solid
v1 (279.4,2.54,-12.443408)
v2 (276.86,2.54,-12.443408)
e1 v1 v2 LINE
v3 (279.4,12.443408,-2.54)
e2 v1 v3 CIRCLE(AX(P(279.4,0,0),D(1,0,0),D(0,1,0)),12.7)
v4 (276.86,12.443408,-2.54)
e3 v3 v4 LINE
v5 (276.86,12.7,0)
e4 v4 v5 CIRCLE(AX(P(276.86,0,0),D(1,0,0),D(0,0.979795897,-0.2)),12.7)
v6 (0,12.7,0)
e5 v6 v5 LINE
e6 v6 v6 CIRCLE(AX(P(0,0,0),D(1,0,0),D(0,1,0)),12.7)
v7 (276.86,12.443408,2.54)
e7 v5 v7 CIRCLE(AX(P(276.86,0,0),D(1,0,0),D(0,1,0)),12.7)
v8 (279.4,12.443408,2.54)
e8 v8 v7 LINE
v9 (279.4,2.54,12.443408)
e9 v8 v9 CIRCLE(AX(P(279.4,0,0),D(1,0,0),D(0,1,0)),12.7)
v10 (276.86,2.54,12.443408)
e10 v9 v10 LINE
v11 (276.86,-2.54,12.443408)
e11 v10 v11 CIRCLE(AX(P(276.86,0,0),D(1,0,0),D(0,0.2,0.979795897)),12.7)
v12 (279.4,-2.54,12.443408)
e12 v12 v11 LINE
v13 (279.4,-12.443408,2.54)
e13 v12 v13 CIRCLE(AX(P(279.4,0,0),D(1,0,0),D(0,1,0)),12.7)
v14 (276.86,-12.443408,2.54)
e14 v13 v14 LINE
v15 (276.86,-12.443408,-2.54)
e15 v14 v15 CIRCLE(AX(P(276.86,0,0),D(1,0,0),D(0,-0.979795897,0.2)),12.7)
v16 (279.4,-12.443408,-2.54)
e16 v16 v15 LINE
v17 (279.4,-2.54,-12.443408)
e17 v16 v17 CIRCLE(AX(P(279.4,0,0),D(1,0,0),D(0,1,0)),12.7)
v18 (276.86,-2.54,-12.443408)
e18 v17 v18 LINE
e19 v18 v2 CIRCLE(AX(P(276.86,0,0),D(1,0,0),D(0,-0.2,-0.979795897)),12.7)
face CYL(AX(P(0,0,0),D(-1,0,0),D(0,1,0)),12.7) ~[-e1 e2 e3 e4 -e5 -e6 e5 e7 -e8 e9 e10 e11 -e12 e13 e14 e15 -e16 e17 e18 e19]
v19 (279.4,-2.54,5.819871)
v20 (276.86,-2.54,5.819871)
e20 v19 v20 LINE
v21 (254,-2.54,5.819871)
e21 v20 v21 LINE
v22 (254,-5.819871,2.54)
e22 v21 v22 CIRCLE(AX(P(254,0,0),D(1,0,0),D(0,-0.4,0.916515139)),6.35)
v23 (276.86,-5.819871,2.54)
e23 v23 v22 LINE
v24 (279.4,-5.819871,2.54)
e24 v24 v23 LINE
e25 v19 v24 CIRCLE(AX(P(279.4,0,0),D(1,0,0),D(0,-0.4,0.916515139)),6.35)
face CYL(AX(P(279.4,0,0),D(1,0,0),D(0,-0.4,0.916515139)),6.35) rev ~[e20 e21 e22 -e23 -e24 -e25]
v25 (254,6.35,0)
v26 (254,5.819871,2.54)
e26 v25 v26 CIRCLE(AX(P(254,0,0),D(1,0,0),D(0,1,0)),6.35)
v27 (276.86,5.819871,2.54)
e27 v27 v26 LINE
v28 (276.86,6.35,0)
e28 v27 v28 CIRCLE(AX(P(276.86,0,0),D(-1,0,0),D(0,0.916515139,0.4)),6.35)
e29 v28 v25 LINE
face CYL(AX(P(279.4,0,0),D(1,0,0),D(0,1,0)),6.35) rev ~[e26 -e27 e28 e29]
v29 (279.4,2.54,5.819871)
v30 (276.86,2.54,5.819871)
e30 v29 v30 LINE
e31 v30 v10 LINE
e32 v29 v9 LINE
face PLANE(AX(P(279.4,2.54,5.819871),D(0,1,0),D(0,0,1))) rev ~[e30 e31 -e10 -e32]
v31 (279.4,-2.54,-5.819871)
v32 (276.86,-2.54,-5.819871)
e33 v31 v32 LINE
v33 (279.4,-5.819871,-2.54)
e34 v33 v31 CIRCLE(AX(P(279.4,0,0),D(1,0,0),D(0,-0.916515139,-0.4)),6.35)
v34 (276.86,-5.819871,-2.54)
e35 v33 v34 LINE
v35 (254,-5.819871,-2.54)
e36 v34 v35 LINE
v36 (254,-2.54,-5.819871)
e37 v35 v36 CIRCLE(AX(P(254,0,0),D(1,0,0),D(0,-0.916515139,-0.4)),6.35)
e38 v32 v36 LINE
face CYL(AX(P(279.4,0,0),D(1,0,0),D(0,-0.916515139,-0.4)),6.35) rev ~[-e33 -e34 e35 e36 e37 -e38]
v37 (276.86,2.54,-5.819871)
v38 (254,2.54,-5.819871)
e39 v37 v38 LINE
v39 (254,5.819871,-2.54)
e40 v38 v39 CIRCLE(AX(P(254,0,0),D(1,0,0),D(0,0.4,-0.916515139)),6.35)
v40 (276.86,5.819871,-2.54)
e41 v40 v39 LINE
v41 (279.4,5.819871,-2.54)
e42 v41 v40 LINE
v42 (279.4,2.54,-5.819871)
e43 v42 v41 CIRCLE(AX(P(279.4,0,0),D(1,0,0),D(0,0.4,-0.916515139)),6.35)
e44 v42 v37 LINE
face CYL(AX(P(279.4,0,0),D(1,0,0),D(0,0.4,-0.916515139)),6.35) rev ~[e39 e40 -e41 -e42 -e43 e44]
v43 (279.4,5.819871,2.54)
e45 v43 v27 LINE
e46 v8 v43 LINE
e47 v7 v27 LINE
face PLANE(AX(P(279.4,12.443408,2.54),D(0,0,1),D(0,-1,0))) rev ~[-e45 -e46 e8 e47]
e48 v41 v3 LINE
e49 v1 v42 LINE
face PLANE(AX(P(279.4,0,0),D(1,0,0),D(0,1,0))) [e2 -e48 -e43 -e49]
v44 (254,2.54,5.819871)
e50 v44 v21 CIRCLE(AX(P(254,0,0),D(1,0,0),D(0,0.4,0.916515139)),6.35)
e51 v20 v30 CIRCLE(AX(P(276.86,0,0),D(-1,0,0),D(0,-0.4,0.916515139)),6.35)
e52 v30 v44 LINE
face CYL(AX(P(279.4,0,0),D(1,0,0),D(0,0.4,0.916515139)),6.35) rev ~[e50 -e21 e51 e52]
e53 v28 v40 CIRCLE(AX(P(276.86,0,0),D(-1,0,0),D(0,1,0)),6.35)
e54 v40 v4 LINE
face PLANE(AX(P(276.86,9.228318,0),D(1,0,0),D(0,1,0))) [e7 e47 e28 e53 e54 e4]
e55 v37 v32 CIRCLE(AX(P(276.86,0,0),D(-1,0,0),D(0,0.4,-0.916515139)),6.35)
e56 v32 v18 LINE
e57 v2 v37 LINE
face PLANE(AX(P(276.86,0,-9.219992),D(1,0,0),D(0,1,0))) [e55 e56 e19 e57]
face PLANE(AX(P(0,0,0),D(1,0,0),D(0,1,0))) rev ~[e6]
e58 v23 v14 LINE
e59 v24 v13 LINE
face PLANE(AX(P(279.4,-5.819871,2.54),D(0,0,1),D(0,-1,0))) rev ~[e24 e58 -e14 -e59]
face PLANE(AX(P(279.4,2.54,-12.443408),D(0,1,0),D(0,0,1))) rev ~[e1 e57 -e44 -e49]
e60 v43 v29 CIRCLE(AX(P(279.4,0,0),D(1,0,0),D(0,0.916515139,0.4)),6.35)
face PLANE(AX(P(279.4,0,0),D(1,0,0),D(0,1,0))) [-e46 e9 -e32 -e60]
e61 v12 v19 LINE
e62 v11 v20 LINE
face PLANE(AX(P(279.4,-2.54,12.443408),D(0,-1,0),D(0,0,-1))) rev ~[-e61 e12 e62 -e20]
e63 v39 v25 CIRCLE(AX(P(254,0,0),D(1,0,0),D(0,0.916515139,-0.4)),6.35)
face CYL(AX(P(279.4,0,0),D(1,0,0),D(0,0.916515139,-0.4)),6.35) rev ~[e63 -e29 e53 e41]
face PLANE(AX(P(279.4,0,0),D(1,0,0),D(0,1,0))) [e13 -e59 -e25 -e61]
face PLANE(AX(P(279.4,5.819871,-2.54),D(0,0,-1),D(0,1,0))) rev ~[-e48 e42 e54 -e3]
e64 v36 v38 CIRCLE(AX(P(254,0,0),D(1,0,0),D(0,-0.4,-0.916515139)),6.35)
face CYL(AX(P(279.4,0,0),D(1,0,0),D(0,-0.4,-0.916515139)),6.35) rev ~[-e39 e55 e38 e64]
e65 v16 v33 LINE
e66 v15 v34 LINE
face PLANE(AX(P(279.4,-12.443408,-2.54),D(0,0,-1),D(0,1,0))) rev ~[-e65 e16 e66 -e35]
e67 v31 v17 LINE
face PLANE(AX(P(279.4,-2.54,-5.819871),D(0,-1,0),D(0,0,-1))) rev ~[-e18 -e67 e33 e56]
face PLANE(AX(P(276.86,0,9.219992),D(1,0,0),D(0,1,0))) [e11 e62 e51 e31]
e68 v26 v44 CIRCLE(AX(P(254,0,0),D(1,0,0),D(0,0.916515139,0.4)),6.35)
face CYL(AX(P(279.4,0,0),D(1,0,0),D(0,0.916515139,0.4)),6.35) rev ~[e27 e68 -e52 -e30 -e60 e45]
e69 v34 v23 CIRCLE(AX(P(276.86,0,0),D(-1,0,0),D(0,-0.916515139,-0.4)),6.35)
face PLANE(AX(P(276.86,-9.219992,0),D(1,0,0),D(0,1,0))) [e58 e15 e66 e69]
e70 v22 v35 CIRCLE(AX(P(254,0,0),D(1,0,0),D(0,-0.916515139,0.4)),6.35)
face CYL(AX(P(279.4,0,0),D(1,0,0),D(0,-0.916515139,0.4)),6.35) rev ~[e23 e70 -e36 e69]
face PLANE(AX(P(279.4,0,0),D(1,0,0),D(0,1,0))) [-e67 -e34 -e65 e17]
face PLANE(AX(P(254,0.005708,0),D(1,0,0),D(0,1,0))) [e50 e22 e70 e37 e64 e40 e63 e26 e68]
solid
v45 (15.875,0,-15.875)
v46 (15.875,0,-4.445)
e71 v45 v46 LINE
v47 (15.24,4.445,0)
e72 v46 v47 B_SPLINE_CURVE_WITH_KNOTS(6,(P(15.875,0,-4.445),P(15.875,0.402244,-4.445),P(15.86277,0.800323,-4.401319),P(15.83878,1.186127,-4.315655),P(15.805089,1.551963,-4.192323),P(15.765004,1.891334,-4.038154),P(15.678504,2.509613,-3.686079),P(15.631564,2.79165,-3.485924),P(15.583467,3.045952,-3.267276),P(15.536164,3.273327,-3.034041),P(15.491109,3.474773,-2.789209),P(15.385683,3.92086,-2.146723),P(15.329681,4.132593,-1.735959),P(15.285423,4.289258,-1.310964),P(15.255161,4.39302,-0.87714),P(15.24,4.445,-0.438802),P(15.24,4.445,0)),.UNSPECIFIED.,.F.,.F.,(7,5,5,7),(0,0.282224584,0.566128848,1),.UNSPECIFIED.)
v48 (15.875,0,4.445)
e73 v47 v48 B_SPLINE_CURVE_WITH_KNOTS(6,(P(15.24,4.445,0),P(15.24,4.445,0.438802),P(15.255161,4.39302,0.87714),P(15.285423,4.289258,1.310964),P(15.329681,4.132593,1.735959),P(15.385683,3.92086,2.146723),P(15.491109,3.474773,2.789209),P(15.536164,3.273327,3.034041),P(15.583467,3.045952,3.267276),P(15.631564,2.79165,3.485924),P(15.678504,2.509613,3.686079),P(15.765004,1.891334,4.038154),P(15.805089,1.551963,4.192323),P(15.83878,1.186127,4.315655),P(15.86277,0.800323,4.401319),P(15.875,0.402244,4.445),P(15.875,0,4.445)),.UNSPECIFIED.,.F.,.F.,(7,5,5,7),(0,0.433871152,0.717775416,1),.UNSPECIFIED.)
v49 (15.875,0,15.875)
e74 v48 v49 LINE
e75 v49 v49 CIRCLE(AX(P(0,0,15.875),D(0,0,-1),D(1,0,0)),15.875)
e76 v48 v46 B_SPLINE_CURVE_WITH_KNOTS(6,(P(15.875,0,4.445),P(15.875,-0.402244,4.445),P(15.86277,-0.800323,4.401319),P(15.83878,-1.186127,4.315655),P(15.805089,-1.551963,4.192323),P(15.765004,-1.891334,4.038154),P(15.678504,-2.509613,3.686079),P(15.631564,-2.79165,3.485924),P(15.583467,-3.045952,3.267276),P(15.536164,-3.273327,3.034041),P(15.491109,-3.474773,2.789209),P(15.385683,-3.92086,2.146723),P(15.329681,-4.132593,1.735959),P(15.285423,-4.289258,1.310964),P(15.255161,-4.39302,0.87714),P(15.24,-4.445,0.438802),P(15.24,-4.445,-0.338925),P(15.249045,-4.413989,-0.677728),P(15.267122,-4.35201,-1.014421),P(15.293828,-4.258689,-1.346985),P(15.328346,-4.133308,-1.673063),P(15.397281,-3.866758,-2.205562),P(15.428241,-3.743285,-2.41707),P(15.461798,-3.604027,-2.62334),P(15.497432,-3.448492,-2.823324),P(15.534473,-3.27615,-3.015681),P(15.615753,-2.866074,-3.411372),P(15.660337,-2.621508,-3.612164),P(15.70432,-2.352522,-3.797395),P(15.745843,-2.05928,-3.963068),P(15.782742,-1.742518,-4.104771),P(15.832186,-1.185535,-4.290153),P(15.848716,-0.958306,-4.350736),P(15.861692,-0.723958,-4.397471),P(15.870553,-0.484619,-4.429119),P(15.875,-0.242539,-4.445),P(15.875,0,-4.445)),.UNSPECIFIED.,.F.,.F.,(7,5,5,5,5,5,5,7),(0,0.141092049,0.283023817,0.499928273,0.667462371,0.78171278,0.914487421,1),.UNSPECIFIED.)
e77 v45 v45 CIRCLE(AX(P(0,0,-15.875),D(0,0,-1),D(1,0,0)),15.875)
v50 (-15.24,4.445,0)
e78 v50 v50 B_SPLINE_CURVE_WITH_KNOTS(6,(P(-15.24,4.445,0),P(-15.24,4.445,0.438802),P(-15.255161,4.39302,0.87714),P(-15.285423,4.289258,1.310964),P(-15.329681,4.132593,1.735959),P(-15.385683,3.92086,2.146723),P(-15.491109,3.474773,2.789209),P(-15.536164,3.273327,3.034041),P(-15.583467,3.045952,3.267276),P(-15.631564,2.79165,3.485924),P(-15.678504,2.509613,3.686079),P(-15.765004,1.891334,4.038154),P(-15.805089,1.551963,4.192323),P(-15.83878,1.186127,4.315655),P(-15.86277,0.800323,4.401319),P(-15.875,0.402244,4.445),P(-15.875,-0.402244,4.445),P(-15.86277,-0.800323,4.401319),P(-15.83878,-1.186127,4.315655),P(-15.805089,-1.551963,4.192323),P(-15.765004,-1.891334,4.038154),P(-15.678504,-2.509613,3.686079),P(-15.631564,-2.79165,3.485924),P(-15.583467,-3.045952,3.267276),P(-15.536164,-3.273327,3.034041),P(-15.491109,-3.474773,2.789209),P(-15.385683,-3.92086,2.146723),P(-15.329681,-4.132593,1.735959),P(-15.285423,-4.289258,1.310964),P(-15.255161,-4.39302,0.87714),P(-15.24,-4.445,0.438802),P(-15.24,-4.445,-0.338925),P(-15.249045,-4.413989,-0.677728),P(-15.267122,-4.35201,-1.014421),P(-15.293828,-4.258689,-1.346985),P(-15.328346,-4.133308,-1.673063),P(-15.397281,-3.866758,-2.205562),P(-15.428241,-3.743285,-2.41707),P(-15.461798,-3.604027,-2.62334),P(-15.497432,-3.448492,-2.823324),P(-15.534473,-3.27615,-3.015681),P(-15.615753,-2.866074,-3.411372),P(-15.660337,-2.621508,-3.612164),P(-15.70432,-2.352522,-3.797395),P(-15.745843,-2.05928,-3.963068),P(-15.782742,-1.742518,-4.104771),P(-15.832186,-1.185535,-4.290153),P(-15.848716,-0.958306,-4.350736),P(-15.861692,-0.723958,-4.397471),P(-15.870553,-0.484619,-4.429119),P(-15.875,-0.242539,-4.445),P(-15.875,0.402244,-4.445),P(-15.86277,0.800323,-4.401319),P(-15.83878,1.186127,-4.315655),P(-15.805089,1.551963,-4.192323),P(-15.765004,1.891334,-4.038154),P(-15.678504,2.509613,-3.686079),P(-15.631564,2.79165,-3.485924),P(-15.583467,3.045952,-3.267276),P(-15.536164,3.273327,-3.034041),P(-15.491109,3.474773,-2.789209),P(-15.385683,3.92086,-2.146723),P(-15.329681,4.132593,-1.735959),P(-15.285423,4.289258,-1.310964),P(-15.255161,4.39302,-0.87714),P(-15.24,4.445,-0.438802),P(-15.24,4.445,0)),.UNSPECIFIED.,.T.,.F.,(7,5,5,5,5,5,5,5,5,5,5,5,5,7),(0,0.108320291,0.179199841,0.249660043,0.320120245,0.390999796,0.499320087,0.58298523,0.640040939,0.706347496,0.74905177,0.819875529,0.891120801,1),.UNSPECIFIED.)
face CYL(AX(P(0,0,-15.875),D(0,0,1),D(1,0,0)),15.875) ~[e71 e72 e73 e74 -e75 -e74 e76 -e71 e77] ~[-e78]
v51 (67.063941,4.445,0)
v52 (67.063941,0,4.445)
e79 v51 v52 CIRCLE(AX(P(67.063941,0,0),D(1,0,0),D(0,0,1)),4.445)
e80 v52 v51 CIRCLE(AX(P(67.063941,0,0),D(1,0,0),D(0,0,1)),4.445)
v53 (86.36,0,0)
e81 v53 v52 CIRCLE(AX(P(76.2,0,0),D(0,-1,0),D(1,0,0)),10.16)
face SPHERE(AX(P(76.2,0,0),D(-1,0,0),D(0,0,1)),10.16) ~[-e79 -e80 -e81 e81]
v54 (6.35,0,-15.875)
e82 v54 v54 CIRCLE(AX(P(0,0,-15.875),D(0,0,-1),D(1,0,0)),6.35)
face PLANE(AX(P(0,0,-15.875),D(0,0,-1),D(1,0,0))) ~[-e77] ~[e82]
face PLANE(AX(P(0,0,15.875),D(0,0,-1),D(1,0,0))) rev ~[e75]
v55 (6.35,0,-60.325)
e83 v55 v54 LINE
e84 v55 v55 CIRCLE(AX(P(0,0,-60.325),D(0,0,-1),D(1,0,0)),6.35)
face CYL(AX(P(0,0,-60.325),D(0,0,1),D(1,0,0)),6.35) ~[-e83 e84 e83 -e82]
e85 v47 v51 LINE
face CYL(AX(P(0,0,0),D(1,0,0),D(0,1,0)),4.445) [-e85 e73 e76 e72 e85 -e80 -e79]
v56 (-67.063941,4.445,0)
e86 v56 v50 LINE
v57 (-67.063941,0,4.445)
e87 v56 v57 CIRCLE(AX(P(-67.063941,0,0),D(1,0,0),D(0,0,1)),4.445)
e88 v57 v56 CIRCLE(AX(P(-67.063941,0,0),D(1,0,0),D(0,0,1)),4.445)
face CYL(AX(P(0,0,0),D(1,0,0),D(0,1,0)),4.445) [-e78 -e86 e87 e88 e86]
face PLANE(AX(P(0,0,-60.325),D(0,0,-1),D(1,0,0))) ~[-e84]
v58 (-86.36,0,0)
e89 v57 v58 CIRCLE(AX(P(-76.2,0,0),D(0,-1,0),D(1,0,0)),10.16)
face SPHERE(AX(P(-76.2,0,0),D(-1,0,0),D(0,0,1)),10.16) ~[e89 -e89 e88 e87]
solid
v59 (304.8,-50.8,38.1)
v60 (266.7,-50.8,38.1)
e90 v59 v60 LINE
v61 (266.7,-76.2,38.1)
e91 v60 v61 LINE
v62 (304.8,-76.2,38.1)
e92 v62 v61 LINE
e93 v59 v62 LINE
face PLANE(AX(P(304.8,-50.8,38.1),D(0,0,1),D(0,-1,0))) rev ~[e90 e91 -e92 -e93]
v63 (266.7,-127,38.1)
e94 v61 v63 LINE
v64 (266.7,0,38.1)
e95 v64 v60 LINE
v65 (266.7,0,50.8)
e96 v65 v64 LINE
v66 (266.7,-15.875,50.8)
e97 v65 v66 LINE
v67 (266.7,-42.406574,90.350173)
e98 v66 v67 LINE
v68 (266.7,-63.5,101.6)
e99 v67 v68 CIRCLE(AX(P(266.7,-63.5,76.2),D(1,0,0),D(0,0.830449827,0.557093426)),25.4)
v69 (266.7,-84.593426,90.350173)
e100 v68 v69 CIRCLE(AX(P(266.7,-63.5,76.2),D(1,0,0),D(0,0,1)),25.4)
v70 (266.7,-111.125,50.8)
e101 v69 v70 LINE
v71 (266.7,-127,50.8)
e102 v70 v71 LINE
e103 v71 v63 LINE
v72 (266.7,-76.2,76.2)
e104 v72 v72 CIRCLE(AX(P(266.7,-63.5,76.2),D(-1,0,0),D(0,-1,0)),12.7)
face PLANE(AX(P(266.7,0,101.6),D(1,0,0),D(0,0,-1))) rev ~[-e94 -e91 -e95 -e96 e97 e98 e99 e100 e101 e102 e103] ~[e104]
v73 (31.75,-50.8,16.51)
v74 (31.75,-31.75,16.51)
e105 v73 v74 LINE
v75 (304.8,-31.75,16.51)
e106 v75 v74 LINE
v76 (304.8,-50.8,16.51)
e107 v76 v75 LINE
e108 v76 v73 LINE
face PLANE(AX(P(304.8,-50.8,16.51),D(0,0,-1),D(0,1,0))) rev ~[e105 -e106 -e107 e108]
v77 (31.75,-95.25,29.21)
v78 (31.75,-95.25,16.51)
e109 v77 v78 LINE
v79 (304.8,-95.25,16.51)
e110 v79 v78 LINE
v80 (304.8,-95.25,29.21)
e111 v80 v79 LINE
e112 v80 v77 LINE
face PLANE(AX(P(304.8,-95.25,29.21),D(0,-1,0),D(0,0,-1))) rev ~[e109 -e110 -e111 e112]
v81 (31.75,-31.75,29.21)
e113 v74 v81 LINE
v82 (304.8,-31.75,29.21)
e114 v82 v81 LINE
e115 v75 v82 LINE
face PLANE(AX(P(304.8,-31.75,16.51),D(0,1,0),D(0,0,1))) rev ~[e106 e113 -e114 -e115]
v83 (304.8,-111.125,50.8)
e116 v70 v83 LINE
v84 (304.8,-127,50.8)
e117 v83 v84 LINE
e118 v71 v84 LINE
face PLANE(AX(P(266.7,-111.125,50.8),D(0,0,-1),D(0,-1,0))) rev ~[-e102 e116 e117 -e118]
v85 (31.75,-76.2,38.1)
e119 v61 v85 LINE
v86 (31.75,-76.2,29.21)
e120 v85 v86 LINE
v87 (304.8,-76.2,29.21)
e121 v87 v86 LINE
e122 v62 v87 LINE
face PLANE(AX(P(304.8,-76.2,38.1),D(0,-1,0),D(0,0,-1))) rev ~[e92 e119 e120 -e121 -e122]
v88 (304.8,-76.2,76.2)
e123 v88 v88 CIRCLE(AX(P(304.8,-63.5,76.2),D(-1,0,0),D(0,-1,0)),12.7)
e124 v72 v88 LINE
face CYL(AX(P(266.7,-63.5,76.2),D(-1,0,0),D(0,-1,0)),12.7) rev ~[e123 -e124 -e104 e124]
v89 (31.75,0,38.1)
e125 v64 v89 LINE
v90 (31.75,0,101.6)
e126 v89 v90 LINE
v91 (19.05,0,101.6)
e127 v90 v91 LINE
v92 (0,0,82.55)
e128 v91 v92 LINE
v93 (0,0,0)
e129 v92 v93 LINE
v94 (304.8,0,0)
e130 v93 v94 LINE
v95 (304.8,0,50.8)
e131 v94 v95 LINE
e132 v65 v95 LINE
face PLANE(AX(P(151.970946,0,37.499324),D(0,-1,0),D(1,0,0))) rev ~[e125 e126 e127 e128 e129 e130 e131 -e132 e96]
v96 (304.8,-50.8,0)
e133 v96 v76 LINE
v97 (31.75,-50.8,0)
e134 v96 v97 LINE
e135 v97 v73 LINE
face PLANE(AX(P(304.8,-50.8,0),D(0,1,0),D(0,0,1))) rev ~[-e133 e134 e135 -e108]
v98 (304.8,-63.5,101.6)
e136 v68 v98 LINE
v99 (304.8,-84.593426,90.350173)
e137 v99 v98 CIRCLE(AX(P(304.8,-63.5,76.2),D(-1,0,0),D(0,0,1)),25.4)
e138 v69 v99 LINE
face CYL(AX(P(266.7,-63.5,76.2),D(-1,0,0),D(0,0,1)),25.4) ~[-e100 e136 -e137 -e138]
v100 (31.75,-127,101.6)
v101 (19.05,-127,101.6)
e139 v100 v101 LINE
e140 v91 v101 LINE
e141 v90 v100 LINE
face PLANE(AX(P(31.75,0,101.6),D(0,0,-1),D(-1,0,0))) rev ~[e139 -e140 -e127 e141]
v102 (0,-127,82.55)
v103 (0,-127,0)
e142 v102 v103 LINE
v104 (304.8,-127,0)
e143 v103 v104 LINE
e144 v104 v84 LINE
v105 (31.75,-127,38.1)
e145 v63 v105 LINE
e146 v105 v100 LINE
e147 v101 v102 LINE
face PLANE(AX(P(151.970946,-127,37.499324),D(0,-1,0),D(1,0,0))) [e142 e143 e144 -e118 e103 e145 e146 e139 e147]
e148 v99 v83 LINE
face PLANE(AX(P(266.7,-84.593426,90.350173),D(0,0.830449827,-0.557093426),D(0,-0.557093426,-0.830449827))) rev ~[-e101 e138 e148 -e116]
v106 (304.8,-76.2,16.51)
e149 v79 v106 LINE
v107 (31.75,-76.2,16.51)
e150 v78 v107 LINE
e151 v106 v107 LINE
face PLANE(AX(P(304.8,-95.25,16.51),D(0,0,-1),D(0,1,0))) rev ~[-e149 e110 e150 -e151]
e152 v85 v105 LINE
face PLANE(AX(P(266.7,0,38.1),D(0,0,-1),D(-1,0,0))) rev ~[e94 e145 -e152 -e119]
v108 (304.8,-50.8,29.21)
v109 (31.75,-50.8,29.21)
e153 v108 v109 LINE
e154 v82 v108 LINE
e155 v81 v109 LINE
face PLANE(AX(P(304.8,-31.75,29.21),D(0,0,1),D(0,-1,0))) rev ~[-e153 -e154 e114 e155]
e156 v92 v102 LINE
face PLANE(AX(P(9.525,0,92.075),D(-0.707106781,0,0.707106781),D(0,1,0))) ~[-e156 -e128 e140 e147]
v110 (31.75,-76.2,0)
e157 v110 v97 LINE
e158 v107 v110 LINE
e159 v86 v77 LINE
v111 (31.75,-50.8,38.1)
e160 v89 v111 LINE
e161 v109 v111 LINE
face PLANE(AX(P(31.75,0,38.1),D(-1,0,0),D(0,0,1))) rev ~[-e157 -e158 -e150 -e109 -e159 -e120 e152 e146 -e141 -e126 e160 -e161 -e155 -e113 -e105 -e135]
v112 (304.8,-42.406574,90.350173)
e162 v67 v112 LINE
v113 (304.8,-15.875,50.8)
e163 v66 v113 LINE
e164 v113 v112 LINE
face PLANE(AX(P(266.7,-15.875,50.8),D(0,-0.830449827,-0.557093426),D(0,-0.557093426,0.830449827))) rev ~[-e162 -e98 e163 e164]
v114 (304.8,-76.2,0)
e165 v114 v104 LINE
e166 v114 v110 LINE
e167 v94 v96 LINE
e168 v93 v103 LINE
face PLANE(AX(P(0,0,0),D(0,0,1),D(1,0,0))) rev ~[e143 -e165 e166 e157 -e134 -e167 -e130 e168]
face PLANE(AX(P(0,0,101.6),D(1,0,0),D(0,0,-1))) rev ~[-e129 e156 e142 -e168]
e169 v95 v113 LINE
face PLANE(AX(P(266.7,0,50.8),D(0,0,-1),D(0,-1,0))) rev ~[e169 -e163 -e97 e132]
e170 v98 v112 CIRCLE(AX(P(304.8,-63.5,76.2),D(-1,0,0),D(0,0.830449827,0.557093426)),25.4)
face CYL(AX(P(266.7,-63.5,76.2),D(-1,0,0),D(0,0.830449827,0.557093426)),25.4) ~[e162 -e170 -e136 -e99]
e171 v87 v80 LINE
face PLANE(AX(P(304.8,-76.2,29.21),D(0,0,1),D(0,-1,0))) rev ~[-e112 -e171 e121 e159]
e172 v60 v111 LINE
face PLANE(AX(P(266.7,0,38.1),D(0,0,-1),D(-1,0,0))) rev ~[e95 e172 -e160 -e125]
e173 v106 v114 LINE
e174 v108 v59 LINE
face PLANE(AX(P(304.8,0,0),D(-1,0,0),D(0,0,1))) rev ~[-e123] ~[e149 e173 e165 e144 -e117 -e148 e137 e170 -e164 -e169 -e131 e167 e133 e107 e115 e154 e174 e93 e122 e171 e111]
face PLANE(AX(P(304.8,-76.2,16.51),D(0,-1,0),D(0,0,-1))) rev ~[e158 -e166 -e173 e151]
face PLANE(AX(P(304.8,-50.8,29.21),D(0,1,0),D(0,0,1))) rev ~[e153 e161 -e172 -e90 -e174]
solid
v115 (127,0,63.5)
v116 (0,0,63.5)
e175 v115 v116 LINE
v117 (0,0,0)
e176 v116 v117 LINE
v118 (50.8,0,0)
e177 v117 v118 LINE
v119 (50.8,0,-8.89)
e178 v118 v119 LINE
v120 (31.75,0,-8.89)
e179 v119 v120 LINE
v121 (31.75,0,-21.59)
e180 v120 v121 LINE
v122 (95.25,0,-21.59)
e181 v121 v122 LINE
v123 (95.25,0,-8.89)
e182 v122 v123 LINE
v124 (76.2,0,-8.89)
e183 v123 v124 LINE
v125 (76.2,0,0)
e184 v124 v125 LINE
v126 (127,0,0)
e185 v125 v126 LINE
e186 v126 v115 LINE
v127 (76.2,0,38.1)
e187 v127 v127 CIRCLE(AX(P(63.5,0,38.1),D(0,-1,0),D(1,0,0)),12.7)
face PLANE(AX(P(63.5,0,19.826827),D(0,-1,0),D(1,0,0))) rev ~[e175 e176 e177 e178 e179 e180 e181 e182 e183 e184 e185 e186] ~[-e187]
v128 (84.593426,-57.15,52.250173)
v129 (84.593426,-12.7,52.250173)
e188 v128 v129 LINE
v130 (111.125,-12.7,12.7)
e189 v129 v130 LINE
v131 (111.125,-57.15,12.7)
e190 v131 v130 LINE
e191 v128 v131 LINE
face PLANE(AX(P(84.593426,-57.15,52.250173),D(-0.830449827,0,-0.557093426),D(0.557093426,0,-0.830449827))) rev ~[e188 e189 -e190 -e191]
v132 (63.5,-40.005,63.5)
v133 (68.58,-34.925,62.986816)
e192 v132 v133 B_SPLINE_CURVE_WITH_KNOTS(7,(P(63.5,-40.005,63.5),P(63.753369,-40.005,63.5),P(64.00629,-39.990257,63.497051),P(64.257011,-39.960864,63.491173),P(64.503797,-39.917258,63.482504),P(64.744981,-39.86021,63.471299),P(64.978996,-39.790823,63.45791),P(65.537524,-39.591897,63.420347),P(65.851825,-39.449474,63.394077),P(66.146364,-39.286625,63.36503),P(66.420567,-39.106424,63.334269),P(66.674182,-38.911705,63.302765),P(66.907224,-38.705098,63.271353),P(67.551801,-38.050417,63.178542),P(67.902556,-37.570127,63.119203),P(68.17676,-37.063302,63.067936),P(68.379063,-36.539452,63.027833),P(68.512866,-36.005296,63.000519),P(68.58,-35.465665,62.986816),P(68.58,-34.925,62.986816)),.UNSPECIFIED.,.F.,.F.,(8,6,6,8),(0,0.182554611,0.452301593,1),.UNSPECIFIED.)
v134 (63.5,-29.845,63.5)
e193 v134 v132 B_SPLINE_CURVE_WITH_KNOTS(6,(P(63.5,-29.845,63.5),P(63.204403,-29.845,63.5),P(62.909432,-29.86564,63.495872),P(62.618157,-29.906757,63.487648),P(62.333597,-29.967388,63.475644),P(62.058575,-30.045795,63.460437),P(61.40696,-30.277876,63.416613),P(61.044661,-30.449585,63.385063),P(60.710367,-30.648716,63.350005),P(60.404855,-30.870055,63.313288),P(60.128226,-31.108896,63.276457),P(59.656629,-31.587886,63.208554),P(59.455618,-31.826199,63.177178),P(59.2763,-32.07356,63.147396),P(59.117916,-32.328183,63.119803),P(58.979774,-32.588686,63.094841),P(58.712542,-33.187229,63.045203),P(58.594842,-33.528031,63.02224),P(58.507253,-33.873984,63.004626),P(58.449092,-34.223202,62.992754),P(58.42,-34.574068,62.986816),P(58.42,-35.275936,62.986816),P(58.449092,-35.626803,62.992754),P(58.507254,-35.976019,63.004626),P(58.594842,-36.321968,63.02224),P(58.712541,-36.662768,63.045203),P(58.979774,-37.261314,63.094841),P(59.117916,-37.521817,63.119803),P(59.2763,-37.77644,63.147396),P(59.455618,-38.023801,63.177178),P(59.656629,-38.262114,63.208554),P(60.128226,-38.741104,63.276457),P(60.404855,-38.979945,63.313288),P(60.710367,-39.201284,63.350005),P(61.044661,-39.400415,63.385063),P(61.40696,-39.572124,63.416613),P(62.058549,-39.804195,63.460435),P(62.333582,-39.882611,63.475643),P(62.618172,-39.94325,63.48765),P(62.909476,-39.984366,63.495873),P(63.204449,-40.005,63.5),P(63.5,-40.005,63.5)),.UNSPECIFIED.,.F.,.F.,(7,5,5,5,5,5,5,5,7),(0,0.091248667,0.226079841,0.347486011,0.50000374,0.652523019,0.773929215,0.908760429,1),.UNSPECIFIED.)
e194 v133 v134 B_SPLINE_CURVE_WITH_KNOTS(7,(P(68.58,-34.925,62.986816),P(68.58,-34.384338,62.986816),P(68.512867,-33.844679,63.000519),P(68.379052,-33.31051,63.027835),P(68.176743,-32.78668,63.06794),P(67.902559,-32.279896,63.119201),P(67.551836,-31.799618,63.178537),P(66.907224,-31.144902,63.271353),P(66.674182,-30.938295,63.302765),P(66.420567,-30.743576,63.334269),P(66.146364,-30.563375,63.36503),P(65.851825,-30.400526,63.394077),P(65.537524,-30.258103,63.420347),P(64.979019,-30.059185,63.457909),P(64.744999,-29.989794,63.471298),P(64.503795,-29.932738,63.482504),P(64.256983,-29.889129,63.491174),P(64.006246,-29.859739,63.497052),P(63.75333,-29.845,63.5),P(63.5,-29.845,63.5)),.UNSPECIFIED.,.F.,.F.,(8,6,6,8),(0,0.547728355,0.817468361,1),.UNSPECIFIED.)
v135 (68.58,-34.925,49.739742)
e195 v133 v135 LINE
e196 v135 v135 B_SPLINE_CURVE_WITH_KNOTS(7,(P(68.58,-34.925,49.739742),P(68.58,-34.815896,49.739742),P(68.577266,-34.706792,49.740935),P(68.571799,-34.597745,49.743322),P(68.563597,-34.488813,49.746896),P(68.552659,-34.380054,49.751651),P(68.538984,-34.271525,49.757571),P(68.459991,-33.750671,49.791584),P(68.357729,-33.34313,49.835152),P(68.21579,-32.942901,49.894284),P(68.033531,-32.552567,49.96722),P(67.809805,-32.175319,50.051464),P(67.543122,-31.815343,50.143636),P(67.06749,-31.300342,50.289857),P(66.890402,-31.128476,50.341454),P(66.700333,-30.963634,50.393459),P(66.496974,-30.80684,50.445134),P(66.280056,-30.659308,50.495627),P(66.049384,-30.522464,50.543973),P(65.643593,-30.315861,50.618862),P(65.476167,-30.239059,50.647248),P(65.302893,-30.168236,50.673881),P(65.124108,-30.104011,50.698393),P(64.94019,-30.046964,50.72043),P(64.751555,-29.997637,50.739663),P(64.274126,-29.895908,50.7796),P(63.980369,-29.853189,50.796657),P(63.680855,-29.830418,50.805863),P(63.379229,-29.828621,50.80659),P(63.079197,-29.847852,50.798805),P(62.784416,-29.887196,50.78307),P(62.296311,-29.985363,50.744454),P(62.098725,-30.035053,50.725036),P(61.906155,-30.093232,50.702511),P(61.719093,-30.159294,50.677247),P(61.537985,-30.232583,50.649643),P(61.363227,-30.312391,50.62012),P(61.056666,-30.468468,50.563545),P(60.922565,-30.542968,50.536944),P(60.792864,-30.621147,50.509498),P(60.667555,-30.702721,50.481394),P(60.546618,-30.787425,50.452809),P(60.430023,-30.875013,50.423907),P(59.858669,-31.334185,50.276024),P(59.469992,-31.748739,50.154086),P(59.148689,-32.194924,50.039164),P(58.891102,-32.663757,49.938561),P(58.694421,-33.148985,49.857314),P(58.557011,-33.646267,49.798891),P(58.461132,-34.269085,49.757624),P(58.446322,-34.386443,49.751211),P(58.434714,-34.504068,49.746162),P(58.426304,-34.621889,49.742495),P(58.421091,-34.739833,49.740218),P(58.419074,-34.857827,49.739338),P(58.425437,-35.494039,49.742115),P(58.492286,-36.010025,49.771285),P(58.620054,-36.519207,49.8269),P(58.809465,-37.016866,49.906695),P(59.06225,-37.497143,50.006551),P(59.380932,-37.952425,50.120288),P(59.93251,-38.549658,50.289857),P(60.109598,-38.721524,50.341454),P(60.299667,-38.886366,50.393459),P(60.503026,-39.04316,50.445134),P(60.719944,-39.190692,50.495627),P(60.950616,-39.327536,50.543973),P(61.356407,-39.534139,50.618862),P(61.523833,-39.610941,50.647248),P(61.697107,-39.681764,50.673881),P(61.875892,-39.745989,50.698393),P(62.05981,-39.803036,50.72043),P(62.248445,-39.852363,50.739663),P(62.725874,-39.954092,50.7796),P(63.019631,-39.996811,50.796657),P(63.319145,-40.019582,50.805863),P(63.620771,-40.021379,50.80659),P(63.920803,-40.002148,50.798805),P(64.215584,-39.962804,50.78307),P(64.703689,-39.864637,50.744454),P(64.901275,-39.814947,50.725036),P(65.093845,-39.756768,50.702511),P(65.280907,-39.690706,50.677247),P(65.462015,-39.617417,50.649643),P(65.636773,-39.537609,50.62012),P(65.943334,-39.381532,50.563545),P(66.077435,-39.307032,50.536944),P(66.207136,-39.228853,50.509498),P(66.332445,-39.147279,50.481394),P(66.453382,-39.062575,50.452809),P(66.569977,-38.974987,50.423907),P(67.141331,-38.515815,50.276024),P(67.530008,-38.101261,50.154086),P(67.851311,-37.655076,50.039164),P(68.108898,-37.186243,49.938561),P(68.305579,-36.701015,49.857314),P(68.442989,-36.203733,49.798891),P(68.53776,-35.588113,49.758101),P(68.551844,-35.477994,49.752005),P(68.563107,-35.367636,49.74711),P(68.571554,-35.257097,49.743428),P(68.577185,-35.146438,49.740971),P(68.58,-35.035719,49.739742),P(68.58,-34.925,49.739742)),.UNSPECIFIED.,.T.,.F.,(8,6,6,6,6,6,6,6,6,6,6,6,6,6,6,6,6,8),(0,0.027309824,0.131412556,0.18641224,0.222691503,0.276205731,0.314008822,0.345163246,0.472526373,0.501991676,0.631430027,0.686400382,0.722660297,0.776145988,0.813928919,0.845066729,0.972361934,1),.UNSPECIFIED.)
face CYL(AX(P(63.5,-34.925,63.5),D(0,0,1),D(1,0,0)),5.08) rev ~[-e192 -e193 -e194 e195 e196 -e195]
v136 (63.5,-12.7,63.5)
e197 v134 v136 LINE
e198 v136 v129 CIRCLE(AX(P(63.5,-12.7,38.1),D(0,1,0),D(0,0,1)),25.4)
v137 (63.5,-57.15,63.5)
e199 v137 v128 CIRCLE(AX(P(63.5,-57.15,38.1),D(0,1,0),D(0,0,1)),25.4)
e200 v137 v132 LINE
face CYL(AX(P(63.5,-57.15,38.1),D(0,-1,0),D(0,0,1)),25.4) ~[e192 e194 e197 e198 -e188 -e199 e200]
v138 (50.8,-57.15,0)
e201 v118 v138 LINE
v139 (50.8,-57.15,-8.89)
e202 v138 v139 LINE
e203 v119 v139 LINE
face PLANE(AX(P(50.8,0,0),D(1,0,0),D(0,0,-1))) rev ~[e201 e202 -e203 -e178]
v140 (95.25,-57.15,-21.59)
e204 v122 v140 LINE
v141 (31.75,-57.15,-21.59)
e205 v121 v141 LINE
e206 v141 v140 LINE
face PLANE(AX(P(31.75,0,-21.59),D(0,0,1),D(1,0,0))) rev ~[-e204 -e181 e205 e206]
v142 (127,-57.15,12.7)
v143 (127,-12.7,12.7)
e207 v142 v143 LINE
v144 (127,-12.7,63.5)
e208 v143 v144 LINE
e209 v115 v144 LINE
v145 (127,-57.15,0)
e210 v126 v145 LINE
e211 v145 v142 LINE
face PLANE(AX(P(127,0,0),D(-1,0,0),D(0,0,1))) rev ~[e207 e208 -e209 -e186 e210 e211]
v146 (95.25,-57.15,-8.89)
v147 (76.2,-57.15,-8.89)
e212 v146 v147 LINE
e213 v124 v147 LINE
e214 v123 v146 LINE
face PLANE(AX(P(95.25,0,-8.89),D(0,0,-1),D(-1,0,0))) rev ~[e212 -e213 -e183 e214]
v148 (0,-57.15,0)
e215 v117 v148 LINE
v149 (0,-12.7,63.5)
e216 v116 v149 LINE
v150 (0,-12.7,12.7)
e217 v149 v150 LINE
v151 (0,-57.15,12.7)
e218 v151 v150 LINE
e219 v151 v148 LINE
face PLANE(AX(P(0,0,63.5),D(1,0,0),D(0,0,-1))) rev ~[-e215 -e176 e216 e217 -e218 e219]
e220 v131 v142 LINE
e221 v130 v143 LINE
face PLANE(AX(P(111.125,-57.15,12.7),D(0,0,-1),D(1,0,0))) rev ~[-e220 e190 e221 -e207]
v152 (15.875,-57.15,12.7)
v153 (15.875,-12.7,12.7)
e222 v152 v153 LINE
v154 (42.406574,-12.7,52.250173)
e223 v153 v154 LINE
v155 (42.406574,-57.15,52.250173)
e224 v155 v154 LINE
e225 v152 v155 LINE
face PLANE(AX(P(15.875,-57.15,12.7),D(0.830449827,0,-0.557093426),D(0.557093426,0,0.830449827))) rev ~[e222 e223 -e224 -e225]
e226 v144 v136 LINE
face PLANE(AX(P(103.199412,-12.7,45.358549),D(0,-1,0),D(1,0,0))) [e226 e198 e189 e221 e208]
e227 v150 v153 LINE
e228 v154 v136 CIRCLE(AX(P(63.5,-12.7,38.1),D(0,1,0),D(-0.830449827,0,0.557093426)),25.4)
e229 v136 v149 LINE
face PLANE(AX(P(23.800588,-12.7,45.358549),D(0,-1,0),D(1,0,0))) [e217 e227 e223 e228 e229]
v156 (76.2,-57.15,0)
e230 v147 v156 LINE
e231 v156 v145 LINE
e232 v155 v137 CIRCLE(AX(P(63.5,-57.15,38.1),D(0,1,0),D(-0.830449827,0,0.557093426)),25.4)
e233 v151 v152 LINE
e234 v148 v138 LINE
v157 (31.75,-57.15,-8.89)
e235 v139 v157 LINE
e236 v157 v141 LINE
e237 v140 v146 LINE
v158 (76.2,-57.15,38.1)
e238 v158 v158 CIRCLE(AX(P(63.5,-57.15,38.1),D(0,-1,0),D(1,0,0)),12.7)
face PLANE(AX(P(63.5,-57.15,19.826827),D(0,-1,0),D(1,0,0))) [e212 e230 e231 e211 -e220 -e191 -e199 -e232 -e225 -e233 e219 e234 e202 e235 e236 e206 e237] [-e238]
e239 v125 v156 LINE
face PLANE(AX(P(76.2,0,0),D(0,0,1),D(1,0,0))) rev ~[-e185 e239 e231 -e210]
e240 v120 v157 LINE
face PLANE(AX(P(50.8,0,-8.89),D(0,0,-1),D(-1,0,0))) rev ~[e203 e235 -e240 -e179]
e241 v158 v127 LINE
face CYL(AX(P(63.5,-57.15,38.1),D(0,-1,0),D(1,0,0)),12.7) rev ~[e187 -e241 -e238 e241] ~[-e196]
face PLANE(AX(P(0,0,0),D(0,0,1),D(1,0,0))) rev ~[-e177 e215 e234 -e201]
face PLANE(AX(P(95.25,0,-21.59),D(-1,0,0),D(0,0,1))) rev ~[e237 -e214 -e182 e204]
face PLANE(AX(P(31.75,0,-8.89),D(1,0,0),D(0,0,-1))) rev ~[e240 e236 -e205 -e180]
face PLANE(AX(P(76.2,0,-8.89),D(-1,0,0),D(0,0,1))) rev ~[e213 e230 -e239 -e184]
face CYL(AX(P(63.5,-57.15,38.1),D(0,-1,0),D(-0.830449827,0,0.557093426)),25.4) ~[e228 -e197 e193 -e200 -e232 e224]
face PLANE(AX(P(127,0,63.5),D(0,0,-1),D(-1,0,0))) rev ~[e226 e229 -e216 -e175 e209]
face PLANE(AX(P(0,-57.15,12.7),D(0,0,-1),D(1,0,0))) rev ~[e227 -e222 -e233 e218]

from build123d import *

# Parameters (mm, degrees)
F1_DEPTH  = 127
F2_SIZE2  = 19.05
F2_SIZE   = 19.05
F4_DEPTH  = 273.05
F5_R      = 12.7
F6_DEPTH  = 38.101
F8_DEPTH  = 57.15
F10_DEPTH = 44.45
F9_R      = 12.7
F11_DEPTH = 57.151
F12_R     = 5.08
F13_REACH = 99.4594097937
F14_R     = 12.7
F15_DEPTH = 279.4
F17_DEPTH = 25.4
F18_DEPTH = 2.54
F19_R     = 4.445
F20_DEPTH = 76.2


with BuildPart() as f1:
    # F0 (on Front) → F1 (new body)
    with BuildSketch(Plane.XZ):
        Polygon((31.75, 38.1), (31.75, 101.6), (0, 101.6), (0, 0), (304.8, 0), (304.8, 101.6), (266.7, 101.6), (266.7, 38.1), align=None)
    extrude(amount=F1_DEPTH)

    # F2
    f2_edges = [f1.edges().sort_by_distance(p)[0] for p in [
        (0, -63.5, 101.6),
    ]]
    chamfer(f2_edges, length=F2_SIZE, length2=F2_SIZE2)

    # F3 (on face) → F4 (cut, through all)
    with BuildSketch(Plane.YZ.offset(304.8)):
        Polygon((-76.2, 16.51), (-76.2, 0), (-50.8, 0), (-50.8, 16.51), (-31.75, 16.51), (-31.75, 29.21), (-50.8, 29.21), (-50.8, 38.1), (-76.2, 38.1), (-76.2, 29.21), (-95.25, 29.21), (-95.25, 16.51), align=None)
    extrude(amount=-F4_DEPTH, mode=Mode.SUBTRACT)

    # F5 (on face) → F6 (cut, through all)
    with BuildSketch(Plane(origin=(266.7, 0, 0), x_dir=(0, -1, 0), z_dir=(-1, 0, 0))):
        with BuildLine():
            Line((0, 101.6), (0, 50.8))
            Line((0, 50.8), (15.875, 50.8))
            Line((15.875, 50.8), (42.4065743945, 90.3501730104))
            ThreePointArc((42.4065743945, 90.3501730104), (51.5470588235, 98.6117647059), (63.5, 101.6))
            Line((63.5, 101.6), (0, 101.6))
        make_face()
        with BuildLine():
            Line((84.5934256055, 90.3501730104), (111.125, 50.8))
            Line((111.125, 50.8), (127, 50.8))
            Line((127, 50.8), (127, 101.6))
            Line((127, 101.6), (63.5, 101.6))
            ThreePointArc((63.5, 101.6), (75.4529411765, 98.6117647059), (84.5934256055, 90.3501730104))
        make_face()
        with Locations((63.5, 76.2)):
            Circle(F5_R)
    extrude(amount=-F6_DEPTH, mode=Mode.SUBTRACT)


with BuildPart() as f8:
    # F7 (on Front) → F8 (new body)
    with BuildSketch(Plane.XZ):
        Polygon((0, 63.5), (0, 0), (50.8, 0), (50.8, -8.89), (31.75, -8.89), (31.75, -21.59), (95.25, -21.59), (95.25, -8.89), (76.2, -8.89), (76.2, 0), (127, 0), (127, 63.5), align=None)
    extrude(amount=F8_DEPTH)

    # F9 (on face) → F10 (cut)
    with BuildSketch(Plane.XZ.offset(57.15)):
        with BuildLine():
            Line((0, 63.5), (0, 12.7))
            Line((0, 12.7), (15.875, 12.7))
            Line((15.875, 12.7), (42.4065743945, 52.2501730104))
            ThreePointArc((42.4065743945, 52.2501730104), (51.5470588235, 60.5117647059), (63.5, 63.5))
            Line((63.5, 63.5), (0, 63.5))
        make_face()
        with BuildLine():
            Line((127, 63.5), (63.5, 63.5))
            ThreePointArc((63.5, 63.5), (75.4529411765, 60.5117647059), (84.5934256055, 52.2501730104))
            Line((84.5934256055, 52.2501730104), (111.125, 12.7))
            Line((111.125, 12.7), (127, 12.7))
            Line((127, 12.7), (127, 63.5))
        make_face()
    extrude(amount=-F10_DEPTH, mode=Mode.SUBTRACT)

    # F9 (on face) → F11 (cut, through all)
    with BuildSketch(Plane.XZ.offset(57.15)):
        with Locations((63.5, 38.1)):
            Circle(F9_R)
    extrude(amount=-F11_DEPTH, mode=Mode.SUBTRACT)

    f13_end = f8.faces().sort_by_distance((50.8, -28.575, 38.1))[0]
    # F12 (on face) → F13 (cut, up to a face of the model that its end follows)
    with BuildSketch(Plane.XY.offset(63.5)):
        with Locations((63.5, -34.925)):
            Circle(F12_R)
    f13_long = extrude(amount=-F13_REACH, mode=Mode.PRIVATE)
    add(split(f13_long, bisect_by=f13_end, keep=Keep.ALL, mode=Mode.PRIVATE).solids().sort_by_distance((63.5, -34.925, 63.5))[0], mode=Mode.SUBTRACT)


with BuildPart() as f15:
    # F14 (on Right) → F15 (new body)
    with BuildSketch(Plane.YZ):
        Circle(F14_R)
    extrude(amount=F15_DEPTH)

    # F16 (on face) → F17 (cut)
    with BuildSketch(Plane.YZ.offset(279.4)):
        with BuildLine():
            ThreePointArc((5.8198711326, -2.54), (6.2160550871, -1.2973662374), (6.35, 0))
            ThreePointArc((6.35, 0), (6.2160550871, 1.2973662374), (5.8198711326, 2.54))
            ThreePointArc((5.8198711326, 2.54), (4.4901280605, 4.4901280605), (2.54, 5.8198711326))
            ThreePointArc((2.54, 5.8198711326), (0, 6.35), (-2.54, 5.8198711326))
            ThreePointArc((-2.54, 5.8198711326), (-4.4901280605, 4.4901280605), (-5.8198711326, 2.54))
            ThreePointArc((-5.8198711326, 2.54), (-6.35, 0), (-5.8198711326, -2.54))
            ThreePointArc((-5.8198711326, -2.54), (-4.4901280605, -4.4901280605), (-2.54, -5.8198711326))
            ThreePointArc((-2.54, -5.8198711326), (0, -6.35), (2.54, -5.8198711326))
            ThreePointArc((2.54, -5.8198711326), (4.4901280605, -4.4901280605), (5.8198711326, -2.54))
        make_face()
    extrude(amount=-F17_DEPTH, mode=Mode.SUBTRACT)

    # F16 (on face) → F18 (cut)
    with BuildSketch(Plane.YZ.offset(279.4)):
        with BuildLine():
            ThreePointArc((-5.8198711326, -2.54), (-6.35, 0), (-5.8198711326, 2.54))
            Line((-5.8198711326, 2.54), (-12.4434078933, 2.54))
            ThreePointArc((-12.4434078933, 2.54), (-12.7, 0), (-12.4434078933, -2.54))
            Line((-12.4434078933, -2.54), (-5.8198711326, -2.54))
        make_face()
        with BuildLine():
            ThreePointArc((-2.54, 5.8198711326), (0, 6.35), (2.54, 5.8198711326))
            Line((2.54, 5.8198711326), (2.54, 12.4434078933))
            ThreePointArc((2.54, 12.4434078933), (0, 12.7), (-2.54, 12.4434078933))
            Line((-2.54, 12.4434078933), (-2.54, 5.8198711326))
        make_face()
        with BuildLine():
            ThreePointArc((5.8198711326, 2.54), (6.2160550871, 1.2973662374), (6.35, 0))
            ThreePointArc((6.35, 0), (6.2160550871, -1.2973662374), (5.8198711326, -2.54))
            Line((5.8198711326, -2.54), (12.4434078933, -2.54))
            ThreePointArc((12.4434078933, -2.54), (12.6356891432, -1.2764638175), (12.7, 0))
            ThreePointArc((12.7, 0), (12.6356891432, 1.2764638175), (12.4434078933, 2.54))
            Line((12.4434078933, 2.54), (5.8198711326, 2.54))
        make_face()
        with BuildLine():
            Line((2.54, -12.4434078933), (2.54, -5.8198711326))
            ThreePointArc((2.54, -5.8198711326), (0, -6.35), (-2.54, -5.8198711326))
            Line((-2.54, -5.8198711326), (-2.54, -12.4434078933))
            ThreePointArc((-2.54, -12.4434078933), (0, -12.7), (2.54, -12.4434078933))
        make_face()
    extrude(amount=-F18_DEPTH, mode=Mode.SUBTRACT)


with BuildPart() as f20:
    # F19 (on Right) → F20 (new body, symmetric)
    with BuildSketch(Plane.YZ):
        Circle(F19_R)
    extrude(amount=F20_DEPTH, both=True)

    # F21 (on Front) → F22 (revolve)
    with BuildSketch(Plane.XZ):
        Polygon((0, 15.875), (0, -60.325), (6.35, -60.325), (6.35, -15.875), (15.875, -15.875), (15.875, 15.875), align=None)
    revolve(axis=Axis((0, 0, -22.225), (0, 0, -1)))

    # F23 (on Front) → F24 (revolve)
    with BuildSketch(Plane.XZ):
        with BuildLine():
            Line((-86.36, 0), (-66.04, 0))
            ThreePointArc((-66.04, 0), (-76.2, 10.16), (-86.36, 0))
        make_face()
        with BuildLine():
            Line((66.04, 0), (86.36, 0))
            ThreePointArc((86.36, 0), (76.2, 10.16), (66.04, 0))
        make_face()
    revolve(axis=Axis((-76.2, 0, 0), (1, 0, 0)))


solid = Compound([f1.part, f8.part, f15.part, f20.part])
